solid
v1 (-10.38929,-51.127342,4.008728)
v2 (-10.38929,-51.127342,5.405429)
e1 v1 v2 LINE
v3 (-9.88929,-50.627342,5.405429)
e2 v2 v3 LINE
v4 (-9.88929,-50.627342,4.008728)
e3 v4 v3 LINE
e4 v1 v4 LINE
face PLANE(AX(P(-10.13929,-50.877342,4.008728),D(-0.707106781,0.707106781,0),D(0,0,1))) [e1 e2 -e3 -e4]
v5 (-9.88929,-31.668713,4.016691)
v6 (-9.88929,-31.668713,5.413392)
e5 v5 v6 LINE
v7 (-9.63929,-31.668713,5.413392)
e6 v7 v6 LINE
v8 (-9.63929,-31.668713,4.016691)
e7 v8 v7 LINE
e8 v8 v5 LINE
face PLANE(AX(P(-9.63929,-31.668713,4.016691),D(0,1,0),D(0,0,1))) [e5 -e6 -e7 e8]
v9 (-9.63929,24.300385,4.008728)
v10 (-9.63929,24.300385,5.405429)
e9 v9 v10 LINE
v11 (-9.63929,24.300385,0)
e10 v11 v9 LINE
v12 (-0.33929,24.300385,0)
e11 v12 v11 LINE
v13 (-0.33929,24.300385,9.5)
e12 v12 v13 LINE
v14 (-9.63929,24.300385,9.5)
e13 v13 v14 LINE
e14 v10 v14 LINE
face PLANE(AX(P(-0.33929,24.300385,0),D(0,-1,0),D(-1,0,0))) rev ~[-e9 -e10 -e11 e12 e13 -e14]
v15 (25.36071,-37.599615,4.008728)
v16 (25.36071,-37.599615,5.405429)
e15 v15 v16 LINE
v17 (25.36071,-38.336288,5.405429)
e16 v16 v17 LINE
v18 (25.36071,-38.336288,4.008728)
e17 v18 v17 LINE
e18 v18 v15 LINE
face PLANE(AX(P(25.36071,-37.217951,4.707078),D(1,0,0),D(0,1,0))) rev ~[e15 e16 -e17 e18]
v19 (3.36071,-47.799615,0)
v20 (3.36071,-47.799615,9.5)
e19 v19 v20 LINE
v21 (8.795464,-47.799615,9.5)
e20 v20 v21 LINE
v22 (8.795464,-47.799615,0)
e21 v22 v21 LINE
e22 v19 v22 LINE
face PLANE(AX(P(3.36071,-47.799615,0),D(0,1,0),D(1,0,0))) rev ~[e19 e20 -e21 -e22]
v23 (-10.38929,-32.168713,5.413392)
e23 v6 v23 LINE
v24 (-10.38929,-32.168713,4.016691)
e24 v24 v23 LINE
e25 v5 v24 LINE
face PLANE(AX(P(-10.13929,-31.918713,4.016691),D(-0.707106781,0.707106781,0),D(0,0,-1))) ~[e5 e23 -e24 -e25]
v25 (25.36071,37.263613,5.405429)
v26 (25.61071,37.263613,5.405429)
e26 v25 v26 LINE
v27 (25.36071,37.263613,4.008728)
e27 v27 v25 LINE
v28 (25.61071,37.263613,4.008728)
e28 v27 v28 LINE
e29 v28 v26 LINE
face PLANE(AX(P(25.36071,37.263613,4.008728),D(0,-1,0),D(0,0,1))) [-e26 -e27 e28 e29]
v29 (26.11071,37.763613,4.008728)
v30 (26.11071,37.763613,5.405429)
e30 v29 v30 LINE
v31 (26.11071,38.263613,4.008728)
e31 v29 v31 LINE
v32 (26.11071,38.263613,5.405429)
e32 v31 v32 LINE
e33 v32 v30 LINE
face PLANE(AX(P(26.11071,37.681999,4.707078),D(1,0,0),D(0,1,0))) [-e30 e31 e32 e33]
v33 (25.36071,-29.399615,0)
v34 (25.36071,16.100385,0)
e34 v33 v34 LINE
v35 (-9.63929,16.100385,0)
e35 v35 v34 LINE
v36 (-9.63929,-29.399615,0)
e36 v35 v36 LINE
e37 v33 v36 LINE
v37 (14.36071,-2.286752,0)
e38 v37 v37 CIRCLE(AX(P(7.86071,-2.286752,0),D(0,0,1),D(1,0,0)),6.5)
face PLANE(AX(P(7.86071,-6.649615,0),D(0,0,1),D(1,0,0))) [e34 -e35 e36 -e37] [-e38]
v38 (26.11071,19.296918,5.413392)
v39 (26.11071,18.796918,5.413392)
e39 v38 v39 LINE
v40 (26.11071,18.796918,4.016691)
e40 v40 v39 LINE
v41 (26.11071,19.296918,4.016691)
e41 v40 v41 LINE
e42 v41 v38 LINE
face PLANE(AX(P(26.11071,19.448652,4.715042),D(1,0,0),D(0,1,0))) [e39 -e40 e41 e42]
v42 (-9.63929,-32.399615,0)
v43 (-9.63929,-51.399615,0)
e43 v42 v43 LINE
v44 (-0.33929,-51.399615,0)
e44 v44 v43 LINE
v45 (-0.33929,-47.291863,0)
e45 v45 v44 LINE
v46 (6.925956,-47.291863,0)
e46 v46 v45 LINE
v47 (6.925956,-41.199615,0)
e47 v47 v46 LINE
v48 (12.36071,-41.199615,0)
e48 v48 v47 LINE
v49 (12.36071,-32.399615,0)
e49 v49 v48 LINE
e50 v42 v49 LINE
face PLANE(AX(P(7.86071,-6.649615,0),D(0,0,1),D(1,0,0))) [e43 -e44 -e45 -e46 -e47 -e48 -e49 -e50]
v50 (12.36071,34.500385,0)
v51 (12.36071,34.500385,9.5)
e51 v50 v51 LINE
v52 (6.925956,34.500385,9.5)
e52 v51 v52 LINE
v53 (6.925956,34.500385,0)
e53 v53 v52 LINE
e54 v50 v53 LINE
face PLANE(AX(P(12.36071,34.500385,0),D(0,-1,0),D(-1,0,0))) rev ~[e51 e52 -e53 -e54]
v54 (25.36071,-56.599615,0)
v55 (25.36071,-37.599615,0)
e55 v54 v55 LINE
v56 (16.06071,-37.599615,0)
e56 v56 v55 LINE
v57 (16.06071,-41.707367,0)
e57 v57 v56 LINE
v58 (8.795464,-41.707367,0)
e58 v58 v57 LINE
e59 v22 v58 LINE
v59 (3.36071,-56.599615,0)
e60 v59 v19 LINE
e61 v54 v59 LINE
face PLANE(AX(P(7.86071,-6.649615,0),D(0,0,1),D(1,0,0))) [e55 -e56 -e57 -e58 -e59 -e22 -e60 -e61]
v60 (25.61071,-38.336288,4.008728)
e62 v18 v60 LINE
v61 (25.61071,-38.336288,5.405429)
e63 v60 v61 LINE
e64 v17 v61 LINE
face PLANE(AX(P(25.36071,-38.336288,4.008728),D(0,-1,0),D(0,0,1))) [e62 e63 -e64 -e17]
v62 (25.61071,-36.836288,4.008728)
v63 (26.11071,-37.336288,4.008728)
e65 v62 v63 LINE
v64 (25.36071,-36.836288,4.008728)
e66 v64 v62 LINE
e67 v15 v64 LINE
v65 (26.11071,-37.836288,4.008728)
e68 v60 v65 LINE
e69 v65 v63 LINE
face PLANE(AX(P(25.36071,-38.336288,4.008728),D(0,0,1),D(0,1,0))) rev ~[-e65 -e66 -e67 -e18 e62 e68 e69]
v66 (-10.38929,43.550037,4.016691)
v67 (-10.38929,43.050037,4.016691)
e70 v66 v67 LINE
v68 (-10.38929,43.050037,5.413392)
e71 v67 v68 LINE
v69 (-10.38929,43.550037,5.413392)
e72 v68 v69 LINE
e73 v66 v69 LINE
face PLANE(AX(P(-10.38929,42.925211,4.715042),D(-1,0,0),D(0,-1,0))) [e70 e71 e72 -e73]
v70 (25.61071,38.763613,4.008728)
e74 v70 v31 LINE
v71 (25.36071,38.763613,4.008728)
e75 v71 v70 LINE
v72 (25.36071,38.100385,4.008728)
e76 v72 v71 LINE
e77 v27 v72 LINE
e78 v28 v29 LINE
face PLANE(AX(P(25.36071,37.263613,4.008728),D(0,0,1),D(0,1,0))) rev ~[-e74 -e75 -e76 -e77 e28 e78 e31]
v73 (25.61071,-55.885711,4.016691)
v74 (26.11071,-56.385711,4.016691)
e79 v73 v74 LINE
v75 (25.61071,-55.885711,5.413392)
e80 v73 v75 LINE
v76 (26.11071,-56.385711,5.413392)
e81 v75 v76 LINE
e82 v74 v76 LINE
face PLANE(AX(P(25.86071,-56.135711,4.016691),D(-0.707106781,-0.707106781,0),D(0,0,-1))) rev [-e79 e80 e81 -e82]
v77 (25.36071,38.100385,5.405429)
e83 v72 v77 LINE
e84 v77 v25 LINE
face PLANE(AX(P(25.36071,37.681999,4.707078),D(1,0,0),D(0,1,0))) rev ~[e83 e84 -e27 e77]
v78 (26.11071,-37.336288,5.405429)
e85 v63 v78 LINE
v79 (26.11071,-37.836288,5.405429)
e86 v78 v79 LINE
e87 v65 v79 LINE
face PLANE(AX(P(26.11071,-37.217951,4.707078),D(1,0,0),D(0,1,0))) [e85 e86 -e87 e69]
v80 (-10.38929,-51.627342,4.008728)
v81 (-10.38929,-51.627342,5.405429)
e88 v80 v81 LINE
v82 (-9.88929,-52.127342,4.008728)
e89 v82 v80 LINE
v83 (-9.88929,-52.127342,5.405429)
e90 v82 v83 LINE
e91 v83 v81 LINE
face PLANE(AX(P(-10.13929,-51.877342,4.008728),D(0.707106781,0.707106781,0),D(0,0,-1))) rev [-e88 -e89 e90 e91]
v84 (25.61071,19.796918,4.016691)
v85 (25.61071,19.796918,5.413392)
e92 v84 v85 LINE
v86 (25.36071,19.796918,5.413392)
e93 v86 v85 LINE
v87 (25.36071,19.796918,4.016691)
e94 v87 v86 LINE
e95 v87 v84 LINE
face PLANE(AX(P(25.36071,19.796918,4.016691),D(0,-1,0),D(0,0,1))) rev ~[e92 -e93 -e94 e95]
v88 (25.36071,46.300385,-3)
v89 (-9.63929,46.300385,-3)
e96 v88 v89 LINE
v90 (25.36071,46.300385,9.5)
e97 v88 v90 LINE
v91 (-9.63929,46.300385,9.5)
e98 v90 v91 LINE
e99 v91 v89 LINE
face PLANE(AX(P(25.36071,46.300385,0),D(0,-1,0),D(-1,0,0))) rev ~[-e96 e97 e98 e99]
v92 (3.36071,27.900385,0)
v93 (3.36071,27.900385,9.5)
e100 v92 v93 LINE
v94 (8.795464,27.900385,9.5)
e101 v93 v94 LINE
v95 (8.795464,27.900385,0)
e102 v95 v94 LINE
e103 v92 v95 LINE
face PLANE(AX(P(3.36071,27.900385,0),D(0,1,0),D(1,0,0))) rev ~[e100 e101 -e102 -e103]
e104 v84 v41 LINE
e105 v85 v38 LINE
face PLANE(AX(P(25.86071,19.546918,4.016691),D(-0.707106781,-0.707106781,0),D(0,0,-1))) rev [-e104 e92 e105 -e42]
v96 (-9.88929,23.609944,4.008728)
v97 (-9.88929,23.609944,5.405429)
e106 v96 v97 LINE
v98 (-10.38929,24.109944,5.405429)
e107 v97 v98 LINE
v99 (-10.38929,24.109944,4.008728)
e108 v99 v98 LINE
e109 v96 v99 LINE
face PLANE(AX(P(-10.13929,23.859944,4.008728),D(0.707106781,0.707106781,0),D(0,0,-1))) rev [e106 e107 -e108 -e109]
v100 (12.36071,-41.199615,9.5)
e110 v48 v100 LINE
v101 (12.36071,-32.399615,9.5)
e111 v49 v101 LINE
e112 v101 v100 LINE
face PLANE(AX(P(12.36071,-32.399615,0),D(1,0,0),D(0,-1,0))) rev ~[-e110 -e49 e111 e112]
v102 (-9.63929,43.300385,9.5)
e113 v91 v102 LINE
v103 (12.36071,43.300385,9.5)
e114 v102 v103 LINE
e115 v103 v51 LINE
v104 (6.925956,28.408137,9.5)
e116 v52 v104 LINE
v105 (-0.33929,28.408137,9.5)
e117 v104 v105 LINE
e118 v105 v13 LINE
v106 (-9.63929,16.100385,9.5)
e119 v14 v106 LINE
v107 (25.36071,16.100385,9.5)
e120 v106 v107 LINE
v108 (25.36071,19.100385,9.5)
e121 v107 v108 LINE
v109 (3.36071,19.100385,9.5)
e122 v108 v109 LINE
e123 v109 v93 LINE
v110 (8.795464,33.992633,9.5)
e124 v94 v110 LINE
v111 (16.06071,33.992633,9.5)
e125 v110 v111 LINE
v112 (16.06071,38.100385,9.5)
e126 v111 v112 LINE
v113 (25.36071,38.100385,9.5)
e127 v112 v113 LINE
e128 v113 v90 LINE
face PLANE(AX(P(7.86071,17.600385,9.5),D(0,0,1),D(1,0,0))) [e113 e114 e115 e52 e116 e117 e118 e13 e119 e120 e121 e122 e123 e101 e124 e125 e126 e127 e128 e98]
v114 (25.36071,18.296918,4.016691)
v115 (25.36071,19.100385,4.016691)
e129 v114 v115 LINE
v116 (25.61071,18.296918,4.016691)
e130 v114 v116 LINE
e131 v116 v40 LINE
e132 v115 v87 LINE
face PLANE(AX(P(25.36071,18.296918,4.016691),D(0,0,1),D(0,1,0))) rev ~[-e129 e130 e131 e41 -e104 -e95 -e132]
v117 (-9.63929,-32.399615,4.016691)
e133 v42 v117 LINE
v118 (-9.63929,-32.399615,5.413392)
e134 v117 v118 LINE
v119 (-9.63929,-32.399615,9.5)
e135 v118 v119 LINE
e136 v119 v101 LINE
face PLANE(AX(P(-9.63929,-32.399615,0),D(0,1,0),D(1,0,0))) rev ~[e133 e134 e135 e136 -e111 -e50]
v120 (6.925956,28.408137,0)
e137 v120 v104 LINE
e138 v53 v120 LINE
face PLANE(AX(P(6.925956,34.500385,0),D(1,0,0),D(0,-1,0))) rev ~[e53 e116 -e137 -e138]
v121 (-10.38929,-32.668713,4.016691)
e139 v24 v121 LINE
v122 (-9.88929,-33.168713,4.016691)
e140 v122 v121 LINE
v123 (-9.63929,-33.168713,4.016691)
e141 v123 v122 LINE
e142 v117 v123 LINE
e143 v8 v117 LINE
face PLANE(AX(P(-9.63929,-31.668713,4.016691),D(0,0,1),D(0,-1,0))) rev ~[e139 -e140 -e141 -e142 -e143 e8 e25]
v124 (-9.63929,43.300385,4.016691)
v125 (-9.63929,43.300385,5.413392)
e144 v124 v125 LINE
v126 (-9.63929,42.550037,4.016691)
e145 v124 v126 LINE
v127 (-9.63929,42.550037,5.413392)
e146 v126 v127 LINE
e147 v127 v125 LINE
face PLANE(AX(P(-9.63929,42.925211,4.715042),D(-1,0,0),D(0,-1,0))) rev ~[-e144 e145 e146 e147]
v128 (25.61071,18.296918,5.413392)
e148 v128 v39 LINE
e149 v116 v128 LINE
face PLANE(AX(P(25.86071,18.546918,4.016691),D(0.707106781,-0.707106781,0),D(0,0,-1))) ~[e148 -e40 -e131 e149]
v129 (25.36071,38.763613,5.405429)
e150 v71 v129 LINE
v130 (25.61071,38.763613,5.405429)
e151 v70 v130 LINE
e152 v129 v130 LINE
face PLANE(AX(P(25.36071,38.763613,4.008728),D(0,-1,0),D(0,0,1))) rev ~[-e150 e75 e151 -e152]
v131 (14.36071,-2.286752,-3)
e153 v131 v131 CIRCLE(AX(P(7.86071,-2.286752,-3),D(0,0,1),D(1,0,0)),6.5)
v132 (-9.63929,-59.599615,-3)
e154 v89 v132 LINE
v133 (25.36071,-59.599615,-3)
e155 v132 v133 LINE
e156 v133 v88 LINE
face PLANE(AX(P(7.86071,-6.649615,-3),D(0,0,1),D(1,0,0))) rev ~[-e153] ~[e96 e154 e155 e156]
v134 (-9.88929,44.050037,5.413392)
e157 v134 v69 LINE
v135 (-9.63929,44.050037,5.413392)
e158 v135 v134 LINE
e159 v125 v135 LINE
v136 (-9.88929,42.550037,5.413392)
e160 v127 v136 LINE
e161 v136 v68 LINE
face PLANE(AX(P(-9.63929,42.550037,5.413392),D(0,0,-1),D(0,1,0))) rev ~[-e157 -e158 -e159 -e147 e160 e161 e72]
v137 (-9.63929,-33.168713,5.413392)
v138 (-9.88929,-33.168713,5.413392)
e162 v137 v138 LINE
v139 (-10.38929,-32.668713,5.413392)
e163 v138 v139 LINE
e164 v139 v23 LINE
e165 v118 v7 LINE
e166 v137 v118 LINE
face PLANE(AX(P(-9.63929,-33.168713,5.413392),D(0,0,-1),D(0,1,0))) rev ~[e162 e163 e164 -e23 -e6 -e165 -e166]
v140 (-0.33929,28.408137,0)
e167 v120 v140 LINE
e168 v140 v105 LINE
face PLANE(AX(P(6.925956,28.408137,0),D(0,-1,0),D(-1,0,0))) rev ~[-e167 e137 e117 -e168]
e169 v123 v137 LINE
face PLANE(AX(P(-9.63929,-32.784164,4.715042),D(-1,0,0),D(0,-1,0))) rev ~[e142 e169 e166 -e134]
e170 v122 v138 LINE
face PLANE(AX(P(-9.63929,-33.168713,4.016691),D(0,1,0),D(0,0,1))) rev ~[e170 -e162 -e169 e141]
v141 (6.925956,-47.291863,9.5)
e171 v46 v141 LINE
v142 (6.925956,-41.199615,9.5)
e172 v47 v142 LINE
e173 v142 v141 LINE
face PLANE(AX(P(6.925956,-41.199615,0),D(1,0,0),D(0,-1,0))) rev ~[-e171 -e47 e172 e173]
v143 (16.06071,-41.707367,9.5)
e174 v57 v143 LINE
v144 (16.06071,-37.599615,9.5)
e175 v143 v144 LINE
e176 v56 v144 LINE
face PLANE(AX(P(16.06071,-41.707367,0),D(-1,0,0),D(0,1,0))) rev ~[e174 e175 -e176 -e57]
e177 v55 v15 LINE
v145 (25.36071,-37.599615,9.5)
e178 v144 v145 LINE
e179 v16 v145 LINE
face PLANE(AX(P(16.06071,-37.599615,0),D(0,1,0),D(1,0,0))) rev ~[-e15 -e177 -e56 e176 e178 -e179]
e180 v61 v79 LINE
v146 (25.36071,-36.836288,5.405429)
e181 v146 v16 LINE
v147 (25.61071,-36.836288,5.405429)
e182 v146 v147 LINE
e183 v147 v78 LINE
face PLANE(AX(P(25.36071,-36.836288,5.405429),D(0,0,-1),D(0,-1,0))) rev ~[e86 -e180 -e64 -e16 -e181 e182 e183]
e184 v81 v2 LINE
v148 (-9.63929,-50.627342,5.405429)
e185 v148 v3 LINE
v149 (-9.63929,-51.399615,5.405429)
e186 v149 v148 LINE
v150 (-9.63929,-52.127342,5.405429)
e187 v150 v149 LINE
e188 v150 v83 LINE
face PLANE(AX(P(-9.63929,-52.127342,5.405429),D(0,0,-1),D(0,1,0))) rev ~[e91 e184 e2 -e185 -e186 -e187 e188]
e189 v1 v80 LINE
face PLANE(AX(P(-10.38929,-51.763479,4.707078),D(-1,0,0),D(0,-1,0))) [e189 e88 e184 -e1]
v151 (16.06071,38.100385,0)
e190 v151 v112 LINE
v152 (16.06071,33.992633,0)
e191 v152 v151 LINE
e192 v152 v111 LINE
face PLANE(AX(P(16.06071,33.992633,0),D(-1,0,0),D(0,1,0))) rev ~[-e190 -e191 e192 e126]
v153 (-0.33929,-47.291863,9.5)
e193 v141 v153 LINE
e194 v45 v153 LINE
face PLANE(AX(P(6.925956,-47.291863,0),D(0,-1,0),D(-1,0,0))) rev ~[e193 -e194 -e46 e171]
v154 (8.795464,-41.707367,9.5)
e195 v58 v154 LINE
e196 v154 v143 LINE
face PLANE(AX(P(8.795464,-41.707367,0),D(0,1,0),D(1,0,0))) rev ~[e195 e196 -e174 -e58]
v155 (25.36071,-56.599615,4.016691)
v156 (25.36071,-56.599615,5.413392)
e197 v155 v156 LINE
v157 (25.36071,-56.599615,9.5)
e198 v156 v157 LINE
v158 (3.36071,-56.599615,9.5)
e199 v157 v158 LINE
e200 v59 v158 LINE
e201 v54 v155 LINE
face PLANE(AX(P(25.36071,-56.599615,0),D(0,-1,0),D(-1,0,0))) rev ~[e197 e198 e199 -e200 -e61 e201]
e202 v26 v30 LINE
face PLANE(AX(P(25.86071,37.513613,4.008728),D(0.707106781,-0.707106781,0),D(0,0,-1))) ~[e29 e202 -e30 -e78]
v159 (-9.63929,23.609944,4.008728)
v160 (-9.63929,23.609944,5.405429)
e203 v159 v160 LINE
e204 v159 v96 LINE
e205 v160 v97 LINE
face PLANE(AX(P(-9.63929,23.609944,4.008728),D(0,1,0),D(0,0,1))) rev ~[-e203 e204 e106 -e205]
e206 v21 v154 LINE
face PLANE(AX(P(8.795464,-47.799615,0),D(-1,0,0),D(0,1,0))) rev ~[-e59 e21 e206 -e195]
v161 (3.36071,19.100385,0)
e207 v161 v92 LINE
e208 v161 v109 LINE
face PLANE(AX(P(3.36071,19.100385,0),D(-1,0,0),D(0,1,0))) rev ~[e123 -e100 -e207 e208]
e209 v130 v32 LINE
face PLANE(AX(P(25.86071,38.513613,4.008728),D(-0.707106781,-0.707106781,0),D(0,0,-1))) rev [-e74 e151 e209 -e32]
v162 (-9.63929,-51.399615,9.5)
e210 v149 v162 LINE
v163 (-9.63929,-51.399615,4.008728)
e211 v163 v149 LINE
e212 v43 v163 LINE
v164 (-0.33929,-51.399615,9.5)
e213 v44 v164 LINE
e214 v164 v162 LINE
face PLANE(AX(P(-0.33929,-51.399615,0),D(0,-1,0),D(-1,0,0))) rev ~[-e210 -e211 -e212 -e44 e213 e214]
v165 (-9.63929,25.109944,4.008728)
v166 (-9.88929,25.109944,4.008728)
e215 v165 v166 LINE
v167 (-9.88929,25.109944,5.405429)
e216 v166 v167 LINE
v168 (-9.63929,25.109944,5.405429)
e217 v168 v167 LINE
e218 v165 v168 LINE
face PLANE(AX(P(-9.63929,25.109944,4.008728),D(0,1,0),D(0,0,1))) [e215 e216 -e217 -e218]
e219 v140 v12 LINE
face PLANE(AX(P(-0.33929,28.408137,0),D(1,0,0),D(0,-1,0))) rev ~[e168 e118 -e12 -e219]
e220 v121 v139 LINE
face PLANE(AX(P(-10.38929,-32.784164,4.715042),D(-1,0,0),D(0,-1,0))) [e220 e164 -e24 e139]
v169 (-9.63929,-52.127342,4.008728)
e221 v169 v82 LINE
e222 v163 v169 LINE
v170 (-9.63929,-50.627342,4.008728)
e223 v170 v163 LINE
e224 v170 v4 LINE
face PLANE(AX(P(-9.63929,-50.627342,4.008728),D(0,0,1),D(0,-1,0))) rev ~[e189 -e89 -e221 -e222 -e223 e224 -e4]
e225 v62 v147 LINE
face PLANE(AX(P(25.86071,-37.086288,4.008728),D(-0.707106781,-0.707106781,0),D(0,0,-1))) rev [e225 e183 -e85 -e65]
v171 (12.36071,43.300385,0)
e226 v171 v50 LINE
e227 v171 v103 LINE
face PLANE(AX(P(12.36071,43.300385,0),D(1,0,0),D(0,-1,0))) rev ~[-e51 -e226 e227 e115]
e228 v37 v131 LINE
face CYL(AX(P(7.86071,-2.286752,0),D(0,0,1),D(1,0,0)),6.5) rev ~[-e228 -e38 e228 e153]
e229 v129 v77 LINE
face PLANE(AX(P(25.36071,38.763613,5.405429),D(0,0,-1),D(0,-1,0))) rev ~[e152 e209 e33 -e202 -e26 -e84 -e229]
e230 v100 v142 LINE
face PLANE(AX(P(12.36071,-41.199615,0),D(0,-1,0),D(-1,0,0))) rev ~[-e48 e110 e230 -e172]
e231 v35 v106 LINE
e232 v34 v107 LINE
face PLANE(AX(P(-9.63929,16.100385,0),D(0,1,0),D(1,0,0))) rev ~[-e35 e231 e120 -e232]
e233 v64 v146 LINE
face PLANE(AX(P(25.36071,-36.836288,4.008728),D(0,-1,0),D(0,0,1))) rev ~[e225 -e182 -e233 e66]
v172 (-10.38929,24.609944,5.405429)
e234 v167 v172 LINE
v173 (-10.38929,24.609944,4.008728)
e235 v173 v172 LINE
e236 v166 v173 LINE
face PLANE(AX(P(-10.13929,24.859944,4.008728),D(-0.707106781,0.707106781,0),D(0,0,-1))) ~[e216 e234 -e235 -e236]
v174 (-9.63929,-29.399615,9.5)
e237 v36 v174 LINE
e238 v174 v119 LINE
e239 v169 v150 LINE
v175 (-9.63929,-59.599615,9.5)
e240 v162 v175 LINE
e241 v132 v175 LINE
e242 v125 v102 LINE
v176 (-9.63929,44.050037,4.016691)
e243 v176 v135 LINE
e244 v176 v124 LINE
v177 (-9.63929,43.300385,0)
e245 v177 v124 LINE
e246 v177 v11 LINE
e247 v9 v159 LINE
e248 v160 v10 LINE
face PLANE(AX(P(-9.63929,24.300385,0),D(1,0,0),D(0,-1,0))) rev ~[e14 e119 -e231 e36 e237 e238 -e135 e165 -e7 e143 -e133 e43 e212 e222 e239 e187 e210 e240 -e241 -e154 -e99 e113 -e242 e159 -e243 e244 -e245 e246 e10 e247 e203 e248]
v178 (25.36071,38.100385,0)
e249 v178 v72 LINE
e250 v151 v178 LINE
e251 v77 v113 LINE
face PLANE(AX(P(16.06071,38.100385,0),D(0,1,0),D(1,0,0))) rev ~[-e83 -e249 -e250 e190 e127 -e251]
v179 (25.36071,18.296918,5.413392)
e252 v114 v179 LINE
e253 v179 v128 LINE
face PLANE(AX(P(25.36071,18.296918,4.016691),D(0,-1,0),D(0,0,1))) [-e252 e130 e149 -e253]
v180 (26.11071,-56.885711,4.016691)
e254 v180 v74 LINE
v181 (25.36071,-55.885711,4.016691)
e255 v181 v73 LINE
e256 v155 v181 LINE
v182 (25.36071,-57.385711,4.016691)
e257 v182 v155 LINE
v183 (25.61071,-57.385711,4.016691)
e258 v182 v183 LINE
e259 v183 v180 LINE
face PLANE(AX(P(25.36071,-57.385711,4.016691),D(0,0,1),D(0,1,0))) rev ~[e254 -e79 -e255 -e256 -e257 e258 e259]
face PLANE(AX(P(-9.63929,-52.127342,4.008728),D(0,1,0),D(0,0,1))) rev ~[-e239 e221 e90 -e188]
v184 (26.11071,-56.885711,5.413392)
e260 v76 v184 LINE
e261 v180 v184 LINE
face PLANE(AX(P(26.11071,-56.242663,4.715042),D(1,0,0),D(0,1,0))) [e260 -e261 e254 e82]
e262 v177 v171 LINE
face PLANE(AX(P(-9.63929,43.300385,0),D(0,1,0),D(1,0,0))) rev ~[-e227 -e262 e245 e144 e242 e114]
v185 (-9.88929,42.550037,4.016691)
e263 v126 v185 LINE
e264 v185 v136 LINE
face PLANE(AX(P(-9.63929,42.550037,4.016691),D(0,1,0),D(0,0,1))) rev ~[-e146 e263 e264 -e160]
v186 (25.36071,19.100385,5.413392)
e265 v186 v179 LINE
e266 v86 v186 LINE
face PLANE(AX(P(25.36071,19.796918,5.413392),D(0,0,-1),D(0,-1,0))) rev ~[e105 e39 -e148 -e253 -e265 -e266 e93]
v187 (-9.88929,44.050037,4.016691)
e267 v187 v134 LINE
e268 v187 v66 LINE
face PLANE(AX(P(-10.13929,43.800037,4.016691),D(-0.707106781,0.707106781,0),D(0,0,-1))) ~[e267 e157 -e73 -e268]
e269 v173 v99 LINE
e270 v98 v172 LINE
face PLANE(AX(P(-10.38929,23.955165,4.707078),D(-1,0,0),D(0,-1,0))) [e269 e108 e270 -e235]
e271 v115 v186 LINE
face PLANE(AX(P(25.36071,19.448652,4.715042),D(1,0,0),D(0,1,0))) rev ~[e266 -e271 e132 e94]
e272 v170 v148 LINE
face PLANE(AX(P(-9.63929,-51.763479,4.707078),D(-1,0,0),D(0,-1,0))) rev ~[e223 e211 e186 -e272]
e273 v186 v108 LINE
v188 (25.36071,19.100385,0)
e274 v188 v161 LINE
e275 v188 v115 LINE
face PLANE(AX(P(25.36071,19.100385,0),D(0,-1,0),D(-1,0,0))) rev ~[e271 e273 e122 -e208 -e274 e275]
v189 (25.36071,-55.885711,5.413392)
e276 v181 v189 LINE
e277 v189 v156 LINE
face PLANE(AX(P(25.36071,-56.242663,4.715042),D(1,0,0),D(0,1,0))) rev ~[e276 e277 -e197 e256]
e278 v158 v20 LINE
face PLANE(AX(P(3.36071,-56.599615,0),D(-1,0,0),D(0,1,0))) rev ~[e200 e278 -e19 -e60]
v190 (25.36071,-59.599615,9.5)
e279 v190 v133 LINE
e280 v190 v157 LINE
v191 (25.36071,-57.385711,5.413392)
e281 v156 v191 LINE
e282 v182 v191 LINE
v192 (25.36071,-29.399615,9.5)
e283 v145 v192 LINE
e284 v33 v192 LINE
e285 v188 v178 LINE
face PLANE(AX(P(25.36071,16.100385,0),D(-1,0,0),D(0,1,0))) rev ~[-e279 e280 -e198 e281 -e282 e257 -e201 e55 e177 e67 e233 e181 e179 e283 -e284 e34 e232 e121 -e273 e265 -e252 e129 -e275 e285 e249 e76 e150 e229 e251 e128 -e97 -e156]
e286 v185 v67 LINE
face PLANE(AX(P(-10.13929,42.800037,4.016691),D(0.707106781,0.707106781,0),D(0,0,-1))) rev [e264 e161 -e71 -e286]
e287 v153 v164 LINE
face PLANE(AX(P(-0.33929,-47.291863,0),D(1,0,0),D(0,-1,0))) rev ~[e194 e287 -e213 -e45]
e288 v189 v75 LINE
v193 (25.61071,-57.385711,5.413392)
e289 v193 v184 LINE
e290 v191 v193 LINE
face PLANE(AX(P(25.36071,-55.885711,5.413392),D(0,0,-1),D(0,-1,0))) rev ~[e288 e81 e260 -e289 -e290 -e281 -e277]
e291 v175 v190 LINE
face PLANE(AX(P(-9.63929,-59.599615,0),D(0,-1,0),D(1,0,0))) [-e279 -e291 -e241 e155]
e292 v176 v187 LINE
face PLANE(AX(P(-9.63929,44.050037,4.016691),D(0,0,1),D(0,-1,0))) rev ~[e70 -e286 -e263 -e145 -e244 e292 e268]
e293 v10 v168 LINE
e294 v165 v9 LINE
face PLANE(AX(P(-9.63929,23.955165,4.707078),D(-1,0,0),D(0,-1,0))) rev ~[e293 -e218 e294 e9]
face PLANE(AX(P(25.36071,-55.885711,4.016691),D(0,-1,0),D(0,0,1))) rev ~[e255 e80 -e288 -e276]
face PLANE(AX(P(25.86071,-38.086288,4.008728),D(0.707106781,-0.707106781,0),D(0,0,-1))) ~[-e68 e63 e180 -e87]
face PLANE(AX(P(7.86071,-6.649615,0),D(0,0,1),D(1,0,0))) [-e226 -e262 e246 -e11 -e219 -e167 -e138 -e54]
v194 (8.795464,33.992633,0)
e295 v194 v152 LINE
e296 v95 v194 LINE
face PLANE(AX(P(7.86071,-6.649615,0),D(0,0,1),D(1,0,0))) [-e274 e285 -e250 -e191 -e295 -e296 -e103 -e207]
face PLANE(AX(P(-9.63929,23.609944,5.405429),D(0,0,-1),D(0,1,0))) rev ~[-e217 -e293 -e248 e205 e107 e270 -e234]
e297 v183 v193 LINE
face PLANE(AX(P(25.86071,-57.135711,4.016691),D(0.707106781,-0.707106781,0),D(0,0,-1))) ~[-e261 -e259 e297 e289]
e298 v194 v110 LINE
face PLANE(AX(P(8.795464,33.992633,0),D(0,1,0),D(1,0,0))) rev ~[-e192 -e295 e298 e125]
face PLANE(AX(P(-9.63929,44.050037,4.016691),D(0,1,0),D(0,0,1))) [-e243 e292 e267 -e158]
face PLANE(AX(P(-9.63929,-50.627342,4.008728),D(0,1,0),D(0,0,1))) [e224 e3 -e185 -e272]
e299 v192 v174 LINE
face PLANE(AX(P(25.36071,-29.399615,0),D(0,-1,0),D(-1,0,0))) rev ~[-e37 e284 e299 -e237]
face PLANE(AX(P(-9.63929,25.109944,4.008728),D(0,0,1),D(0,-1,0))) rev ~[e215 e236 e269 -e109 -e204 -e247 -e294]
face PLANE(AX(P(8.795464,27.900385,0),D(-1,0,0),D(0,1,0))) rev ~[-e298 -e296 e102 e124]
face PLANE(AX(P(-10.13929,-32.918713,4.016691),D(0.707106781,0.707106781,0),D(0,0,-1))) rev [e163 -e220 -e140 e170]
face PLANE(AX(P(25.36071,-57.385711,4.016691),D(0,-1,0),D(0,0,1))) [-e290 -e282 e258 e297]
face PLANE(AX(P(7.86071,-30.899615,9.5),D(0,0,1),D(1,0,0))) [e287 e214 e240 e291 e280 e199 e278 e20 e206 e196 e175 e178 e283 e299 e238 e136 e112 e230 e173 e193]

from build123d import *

# Parameters (mm, degrees)
F0_R     = 6.5
F1_DEPTH = 3
F2_DEPTH = 9.5
F3_W     = 0.6965331137
F3_H     = 1.3967012055
F3_W_2   = 0.8034668863
F3_W_3   = 0.836771971
F3_W_4   = 0.663228029
F3_W_5   = 0.7633265793
F3_W_6   = 0.7366734207
F3_W_7   = 0.7139041424
F3_W_8   = 0.7860958576
F4_DEPTH = 0.75
F5_W     = 0.7277277052
F5_H     = 1.3967012055
F5_W_2   = 0.7722722948
F5_W_3   = 0.7690980434
F5_W_4   = 0.7309019566
F5_W_5   = 0.6904412746
F5_W_6   = 0.8095587254
F5_W_7   = 0.7503486574
F5_W_8   = 0.7496513426
F6_DEPTH = 0.75
F7_SIZE  = 0.5


# Not quite as in the source:
# - ends of sketch curves that miss each other by under 0.0002 mm in the source are joined
# - a feature names something its author has since deleted; it is built from what else it names


with BuildPart() as f1:
    # F0 (on Top) → F1 (new body)
    with BuildSketch(Plane.XY):
        Polygon((7.8607099131, 16.1003852367), (-9.6392899379, 16.1003852367), (-9.6392899379, -29.3996147633), (25.3607097641, -29.3996147633), (25.3607097641, 16.1003852367), align=None)
        with Locations((7.8607099131, -2.2867515218)):
            Circle(F0_R, mode=Mode.SUBTRACT)
        Polygon((25.3607097641, -29.3996147633), (-9.6392899379, -29.3996147633), (-9.6392899379, -32.3996147633), (-6.4715547308, -32.3996147633), (12.3607100621, -32.3996147633), (25.3607097641, -32.3996147633), align=None)
        Polygon((-9.6392899379, 46.3003852367), (-9.6392899379, 43.3003852367), (-6.4715547308, 43.3003852367), (12.3607100621, 43.3003852367), (25.3607097641, 43.3003852367), (25.3607097641, 46.3003852367), align=None)
        Polygon((16.0607097641, 38.1003852367), (25.3607097641, 38.1003852367), (25.3607097641, 43.3003852367), (12.3607100621, 43.3003852367), (12.3607100621, 35.3003852367), (12.3607100621, 34.5003852367), (7.8607097641, 34.5003852367), (7.8607100621, 33.9926332235), (8.7954637781, 33.9926332235), (16.0607097641, 33.9926332235), align=None)
        Polygon((-9.6392899379, 43.3003852367), (-9.6392899379, 24.3003852367), (-0.3392899379, 24.3003852367), (-0.3392899379, 28.4081372499), (6.9259563461, 28.4081372499), (6.9259563461, 34.5003852367), (7.8607100621, 34.5003852367), (12.3607100621, 34.5003852367), (12.3607100621, 35.3003852367), (12.3607100621, 43.3003852367), (-6.4715547308, 43.3003852367), align=None)
        Polygon((3.3607097641, 27.1003852367), (3.3607097641, 19.1003852367), (22.192974557, 19.1003852367), (25.3607097641, 19.1003852367), (25.3607097641, 38.1003852367), (16.0607097641, 38.1003852367), (16.0607097641, 33.9926332235), (8.7954637781, 33.9926332235), (8.7954637781, 27.9003852367), (7.8607100621, 27.9003852367), (3.3607097641, 27.9003852367), align=None)
        Polygon((-9.6392899379, 19.1003852367), (-9.6392899379, 16.1003852367), (7.8607099131, 16.1003852367), (25.3607097641, 16.1003852367), (25.3607097641, 19.1003852367), (22.192974557, 19.1003852367), (3.3607097641, 19.1003852367), align=None)
        Polygon((-9.6392899379, 24.3003852367), (-9.6392899379, 19.1003852367), (3.3607097641, 19.1003852367), (3.3607097641, 27.1003852367), (3.3607097641, 27.9003852367), (7.8607100621, 27.9003852367), (7.8607100621, 28.4081372499), (6.9259563461, 28.4081372499), (-0.3392899379, 28.4081372499), (-0.3392899379, 24.3003852367), align=None)
        Polygon((6.9259563461, 34.5003852367), (6.9259563461, 28.4081372499), (7.8607097641, 28.4081372499), (7.8607100621, 33.9926332235), (7.8607100621, 34.5003852367), align=None)
        Polygon((7.8607100621, 28.4081372499), (7.8607100621, 27.9003852367), (8.7954637781, 27.9003852367), (8.7954637781, 33.9926332235), (7.8607097641, 33.9926332235), align=None)
        Polygon((-6.4715547308, -32.3996147633), (-9.6392899379, -32.3996147633), (-9.6392899379, -51.3996147633), (-0.3392899379, -51.3996147633), (-0.3392899379, -47.2918627501), (6.9259563461, -47.2918627501), (6.9259563461, -41.1996147633), (7.8607100621, -41.1996147633), (12.3607100621, -41.1996147633), (12.3607100621, -40.3996147633), (12.3607100621, -32.3996147633), align=None)
        Polygon((25.3607097641, -56.5996147633), (25.3607097641, -37.5996147633), (16.0607097641, -37.5996147633), (16.0607097641, -41.7073667765), (8.7954637781, -41.7073667765), (8.7954637781, -47.7996147633), (7.8607100621, -47.7996147633), (3.3607097641, -47.7996147633), (3.3607097641, -48.5996147633), (3.3607097641, -56.5996147633), (22.192974557, -56.5996147633), align=None)
        Polygon((25.3607097641, -37.5996147633), (25.3607097641, -32.3996147633), (12.3607100621, -32.3996147633), (12.3607100621, -40.3996147633), (12.3607100621, -41.1996147633), (7.8607097641, -41.1996147633), (7.8607100621, -41.7073667765), (8.7954637781, -41.7073667765), (16.0607097641, -41.7073667765), (16.0607097641, -37.5996147633), align=None)
        Polygon((-0.3392899379, -51.3996147633), (-9.6392899379, -51.3996147633), (-9.6392899379, -56.5996147633), (3.3607097641, -56.5996147633), (3.3607097641, -48.5996147633), (3.3607097641, -47.7996147633), (7.8607100621, -47.7996147633), (7.8607100621, -47.2918627501), (6.9259563461, -47.2918627501), (-0.3392899379, -47.2918627501), align=None)
        Polygon((8.7954637781, -47.7996147633), (8.7954637781, -41.7073667765), (7.8607097641, -41.7073667765), (7.8607100621, -47.2918627501), (7.8607100621, -47.7996147633), align=None)
        Polygon((6.9259563461, -41.1996147633), (6.9259563461, -47.2918627501), (7.8607097641, -47.2918627501), (7.8607100621, -41.7073667765), (7.8607100621, -41.1996147633), align=None)
        Polygon((3.3607097641, -56.5996147633), (-9.6392899379, -56.5996147633), (-9.6392899379, -59.5996147633), (25.3607097641, -59.5996147633), (25.3607097641, -56.5996147633), (22.192974557, -56.5996147633), align=None)
    extrude(amount=-F1_DEPTH)

    # F0 (on Top) → F2 (join)
    with BuildSketch(Plane.XY):
        Polygon((-9.6392899379, 19.1003852367), (-9.6392899379, 16.1003852367), (7.8607099131, 16.1003852367), (25.3607097641, 16.1003852367), (25.3607097641, 19.1003852367), (22.192974557, 19.1003852367), (3.3607097641, 19.1003852367), align=None)
        Polygon((-9.6392899379, 24.3003852367), (-9.6392899379, 19.1003852367), (3.3607097641, 19.1003852367), (3.3607097641, 27.1003852367), (3.3607097641, 27.9003852367), (7.8607100621, 27.9003852367), (7.8607100621, 28.4081372499), (6.9259563461, 28.4081372499), (-0.3392899379, 28.4081372499), (-0.3392899379, 24.3003852367), align=None)
        Polygon((-9.6392899379, 46.3003852367), (-9.6392899379, 43.3003852367), (-6.4715547308, 43.3003852367), (12.3607100621, 43.3003852367), (25.3607097641, 43.3003852367), (25.3607097641, 46.3003852367), align=None)
        Polygon((16.0607097641, 38.1003852367), (25.3607097641, 38.1003852367), (25.3607097641, 43.3003852367), (12.3607100621, 43.3003852367), (12.3607100621, 35.3003852367), (12.3607100621, 34.5003852367), (7.8607097641, 34.5003852367), (7.8607100621, 33.9926332235), (8.7954637781, 33.9926332235), (16.0607097641, 33.9926332235), align=None)
        Polygon((6.9259563461, 34.5003852367), (6.9259563461, 28.4081372499), (7.8607097641, 28.4081372499), (7.8607100621, 33.9926332235), (7.8607100621, 34.5003852367), align=None)
        Polygon((7.8607100621, 28.4081372499), (7.8607100621, 27.9003852367), (8.7954637781, 27.9003852367), (8.7954637781, 33.9926332235), (7.8607097641, 33.9926332235), align=None)
        Polygon((25.3607097641, -29.3996147633), (-9.6392899379, -29.3996147633), (-9.6392899379, -32.3996147633), (-6.4715547308, -32.3996147633), (12.3607100621, -32.3996147633), (25.3607097641, -32.3996147633), align=None)
        Polygon((25.3607097641, -37.5996147633), (25.3607097641, -32.3996147633), (12.3607100621, -32.3996147633), (12.3607100621, -40.3996147633), (12.3607100621, -41.1996147633), (7.8607097641, -41.1996147633), (7.8607100621, -41.7073667765), (8.7954637781, -41.7073667765), (16.0607097641, -41.7073667765), (16.0607097641, -37.5996147633), align=None)
        Polygon((-0.3392899379, -51.3996147633), (-9.6392899379, -51.3996147633), (-9.6392899379, -56.5996147633), (3.3607097641, -56.5996147633), (3.3607097641, -48.5996147633), (3.3607097641, -47.7996147633), (7.8607100621, -47.7996147633), (7.8607100621, -47.2918627501), (6.9259563461, -47.2918627501), (-0.3392899379, -47.2918627501), align=None)
        Polygon((8.7954637781, -47.7996147633), (8.7954637781, -41.7073667765), (7.8607097641, -41.7073667765), (7.8607100621, -47.2918627501), (7.8607100621, -47.7996147633), align=None)
        Polygon((6.9259563461, -41.1996147633), (6.9259563461, -47.2918627501), (7.8607097641, -47.2918627501), (7.8607100621, -41.7073667765), (7.8607100621, -41.1996147633), align=None)
        Polygon((3.3607097641, -56.5996147633), (-9.6392899379, -56.5996147633), (-9.6392899379, -59.5996147633), (25.3607097641, -59.5996147633), (25.3607097641, -56.5996147633), (22.192974557, -56.5996147633), align=None)
    extrude(amount=F2_DEPTH)

    # F3 (on face) → F4 (join)
    with BuildSketch(Plane.YZ.offset(25.3607097641)):
        with Locations((19.4486517936, 4.715041643)):
            Rectangle(F3_W, F3_H)
        with Locations((18.6986517936, 4.715041643)):
            Rectangle(F3_W_2, F3_H)
        with Locations((37.6819992512, 4.7070782166)):
            Rectangle(F3_W_3, F3_H)
        with Locations((38.4319992512, 4.7070782166)):
            Rectangle(F3_W_4, F3_H)
        with Locations((-37.2179514736, 4.7070782166)):
            Rectangle(F3_W_5, F3_H)
        with Locations((-37.9679514736, 4.7070782166)):
            Rectangle(F3_W_6, F3_H)
        with Locations((-56.2426626921, 4.715041643)):
            Rectangle(F3_W_7, F3_H)
        with Locations((-56.9926626921, 4.715041643)):
            Rectangle(F3_W_8, F3_H)
    extrude(amount=F4_DEPTH)

    # F5 (on face) → F6 (join)
    with BuildSketch(Plane(origin=(-9.6392899379, 0, 0), x_dir=(0, -1, 0), z_dir=(-1, 0, 0))):
        with Locations((51.7634786159, 4.7070782166)):
            Rectangle(F5_W, F5_H)
        with Locations((51.0134786159, 4.7070782166)):
            Rectangle(F5_W_2, F5_H)
        with Locations((32.784163785, 4.715041643)):
            Rectangle(F5_W_3, F5_H)
        with Locations((32.034163785, 4.715041643)):
            Rectangle(F5_W_4, F5_H)
        with Locations((-23.9551645994, 4.7070782166)):
            Rectangle(F5_W_5, F5_H)
        with Locations((-24.7051645994, 4.7070782166)):
            Rectangle(F5_W_6, F5_H)
        with Locations((-42.9252109081, 4.715041643)):
            Rectangle(F5_W_7, F5_H)
        with Locations((-43.6752109081, 4.715041643)):
            Rectangle(F5_W_8, F5_H)
    extrude(amount=F6_DEPTH)

    # F7
    f7_edges = [f1.edges().sort_by_distance(p)[0] for p in [
        (26.11071, 38.763613, 4.707078),
        (26.11071, 37.263613, 4.707078),
        (26.11071, 19.796918, 4.715042),
        (26.11071, 18.296918, 4.715042),
        (26.11071, -36.836288, 4.707078),
        (26.11071, -38.336288, 4.707078),
        (26.11071, -55.885711, 4.715042),
        (26.11071, -57.385711, 4.715042),
        (-10.38929, -52.127342, 4.707078),
        (-10.38929, -50.627342, 4.707078),
        (-10.38929, -33.168713, 4.715042),
        (-10.38929, -31.668713, 4.715042),
        (-10.38929, 23.609944, 4.707078),
        (-10.38929, 25.109944, 4.707078),
        (-10.38929, 42.550037, 4.715042),
        (-10.38929, 44.050037, 4.715042),
    ]]
    chamfer(f7_edges, length=F7_SIZE)


solid = f1.part
